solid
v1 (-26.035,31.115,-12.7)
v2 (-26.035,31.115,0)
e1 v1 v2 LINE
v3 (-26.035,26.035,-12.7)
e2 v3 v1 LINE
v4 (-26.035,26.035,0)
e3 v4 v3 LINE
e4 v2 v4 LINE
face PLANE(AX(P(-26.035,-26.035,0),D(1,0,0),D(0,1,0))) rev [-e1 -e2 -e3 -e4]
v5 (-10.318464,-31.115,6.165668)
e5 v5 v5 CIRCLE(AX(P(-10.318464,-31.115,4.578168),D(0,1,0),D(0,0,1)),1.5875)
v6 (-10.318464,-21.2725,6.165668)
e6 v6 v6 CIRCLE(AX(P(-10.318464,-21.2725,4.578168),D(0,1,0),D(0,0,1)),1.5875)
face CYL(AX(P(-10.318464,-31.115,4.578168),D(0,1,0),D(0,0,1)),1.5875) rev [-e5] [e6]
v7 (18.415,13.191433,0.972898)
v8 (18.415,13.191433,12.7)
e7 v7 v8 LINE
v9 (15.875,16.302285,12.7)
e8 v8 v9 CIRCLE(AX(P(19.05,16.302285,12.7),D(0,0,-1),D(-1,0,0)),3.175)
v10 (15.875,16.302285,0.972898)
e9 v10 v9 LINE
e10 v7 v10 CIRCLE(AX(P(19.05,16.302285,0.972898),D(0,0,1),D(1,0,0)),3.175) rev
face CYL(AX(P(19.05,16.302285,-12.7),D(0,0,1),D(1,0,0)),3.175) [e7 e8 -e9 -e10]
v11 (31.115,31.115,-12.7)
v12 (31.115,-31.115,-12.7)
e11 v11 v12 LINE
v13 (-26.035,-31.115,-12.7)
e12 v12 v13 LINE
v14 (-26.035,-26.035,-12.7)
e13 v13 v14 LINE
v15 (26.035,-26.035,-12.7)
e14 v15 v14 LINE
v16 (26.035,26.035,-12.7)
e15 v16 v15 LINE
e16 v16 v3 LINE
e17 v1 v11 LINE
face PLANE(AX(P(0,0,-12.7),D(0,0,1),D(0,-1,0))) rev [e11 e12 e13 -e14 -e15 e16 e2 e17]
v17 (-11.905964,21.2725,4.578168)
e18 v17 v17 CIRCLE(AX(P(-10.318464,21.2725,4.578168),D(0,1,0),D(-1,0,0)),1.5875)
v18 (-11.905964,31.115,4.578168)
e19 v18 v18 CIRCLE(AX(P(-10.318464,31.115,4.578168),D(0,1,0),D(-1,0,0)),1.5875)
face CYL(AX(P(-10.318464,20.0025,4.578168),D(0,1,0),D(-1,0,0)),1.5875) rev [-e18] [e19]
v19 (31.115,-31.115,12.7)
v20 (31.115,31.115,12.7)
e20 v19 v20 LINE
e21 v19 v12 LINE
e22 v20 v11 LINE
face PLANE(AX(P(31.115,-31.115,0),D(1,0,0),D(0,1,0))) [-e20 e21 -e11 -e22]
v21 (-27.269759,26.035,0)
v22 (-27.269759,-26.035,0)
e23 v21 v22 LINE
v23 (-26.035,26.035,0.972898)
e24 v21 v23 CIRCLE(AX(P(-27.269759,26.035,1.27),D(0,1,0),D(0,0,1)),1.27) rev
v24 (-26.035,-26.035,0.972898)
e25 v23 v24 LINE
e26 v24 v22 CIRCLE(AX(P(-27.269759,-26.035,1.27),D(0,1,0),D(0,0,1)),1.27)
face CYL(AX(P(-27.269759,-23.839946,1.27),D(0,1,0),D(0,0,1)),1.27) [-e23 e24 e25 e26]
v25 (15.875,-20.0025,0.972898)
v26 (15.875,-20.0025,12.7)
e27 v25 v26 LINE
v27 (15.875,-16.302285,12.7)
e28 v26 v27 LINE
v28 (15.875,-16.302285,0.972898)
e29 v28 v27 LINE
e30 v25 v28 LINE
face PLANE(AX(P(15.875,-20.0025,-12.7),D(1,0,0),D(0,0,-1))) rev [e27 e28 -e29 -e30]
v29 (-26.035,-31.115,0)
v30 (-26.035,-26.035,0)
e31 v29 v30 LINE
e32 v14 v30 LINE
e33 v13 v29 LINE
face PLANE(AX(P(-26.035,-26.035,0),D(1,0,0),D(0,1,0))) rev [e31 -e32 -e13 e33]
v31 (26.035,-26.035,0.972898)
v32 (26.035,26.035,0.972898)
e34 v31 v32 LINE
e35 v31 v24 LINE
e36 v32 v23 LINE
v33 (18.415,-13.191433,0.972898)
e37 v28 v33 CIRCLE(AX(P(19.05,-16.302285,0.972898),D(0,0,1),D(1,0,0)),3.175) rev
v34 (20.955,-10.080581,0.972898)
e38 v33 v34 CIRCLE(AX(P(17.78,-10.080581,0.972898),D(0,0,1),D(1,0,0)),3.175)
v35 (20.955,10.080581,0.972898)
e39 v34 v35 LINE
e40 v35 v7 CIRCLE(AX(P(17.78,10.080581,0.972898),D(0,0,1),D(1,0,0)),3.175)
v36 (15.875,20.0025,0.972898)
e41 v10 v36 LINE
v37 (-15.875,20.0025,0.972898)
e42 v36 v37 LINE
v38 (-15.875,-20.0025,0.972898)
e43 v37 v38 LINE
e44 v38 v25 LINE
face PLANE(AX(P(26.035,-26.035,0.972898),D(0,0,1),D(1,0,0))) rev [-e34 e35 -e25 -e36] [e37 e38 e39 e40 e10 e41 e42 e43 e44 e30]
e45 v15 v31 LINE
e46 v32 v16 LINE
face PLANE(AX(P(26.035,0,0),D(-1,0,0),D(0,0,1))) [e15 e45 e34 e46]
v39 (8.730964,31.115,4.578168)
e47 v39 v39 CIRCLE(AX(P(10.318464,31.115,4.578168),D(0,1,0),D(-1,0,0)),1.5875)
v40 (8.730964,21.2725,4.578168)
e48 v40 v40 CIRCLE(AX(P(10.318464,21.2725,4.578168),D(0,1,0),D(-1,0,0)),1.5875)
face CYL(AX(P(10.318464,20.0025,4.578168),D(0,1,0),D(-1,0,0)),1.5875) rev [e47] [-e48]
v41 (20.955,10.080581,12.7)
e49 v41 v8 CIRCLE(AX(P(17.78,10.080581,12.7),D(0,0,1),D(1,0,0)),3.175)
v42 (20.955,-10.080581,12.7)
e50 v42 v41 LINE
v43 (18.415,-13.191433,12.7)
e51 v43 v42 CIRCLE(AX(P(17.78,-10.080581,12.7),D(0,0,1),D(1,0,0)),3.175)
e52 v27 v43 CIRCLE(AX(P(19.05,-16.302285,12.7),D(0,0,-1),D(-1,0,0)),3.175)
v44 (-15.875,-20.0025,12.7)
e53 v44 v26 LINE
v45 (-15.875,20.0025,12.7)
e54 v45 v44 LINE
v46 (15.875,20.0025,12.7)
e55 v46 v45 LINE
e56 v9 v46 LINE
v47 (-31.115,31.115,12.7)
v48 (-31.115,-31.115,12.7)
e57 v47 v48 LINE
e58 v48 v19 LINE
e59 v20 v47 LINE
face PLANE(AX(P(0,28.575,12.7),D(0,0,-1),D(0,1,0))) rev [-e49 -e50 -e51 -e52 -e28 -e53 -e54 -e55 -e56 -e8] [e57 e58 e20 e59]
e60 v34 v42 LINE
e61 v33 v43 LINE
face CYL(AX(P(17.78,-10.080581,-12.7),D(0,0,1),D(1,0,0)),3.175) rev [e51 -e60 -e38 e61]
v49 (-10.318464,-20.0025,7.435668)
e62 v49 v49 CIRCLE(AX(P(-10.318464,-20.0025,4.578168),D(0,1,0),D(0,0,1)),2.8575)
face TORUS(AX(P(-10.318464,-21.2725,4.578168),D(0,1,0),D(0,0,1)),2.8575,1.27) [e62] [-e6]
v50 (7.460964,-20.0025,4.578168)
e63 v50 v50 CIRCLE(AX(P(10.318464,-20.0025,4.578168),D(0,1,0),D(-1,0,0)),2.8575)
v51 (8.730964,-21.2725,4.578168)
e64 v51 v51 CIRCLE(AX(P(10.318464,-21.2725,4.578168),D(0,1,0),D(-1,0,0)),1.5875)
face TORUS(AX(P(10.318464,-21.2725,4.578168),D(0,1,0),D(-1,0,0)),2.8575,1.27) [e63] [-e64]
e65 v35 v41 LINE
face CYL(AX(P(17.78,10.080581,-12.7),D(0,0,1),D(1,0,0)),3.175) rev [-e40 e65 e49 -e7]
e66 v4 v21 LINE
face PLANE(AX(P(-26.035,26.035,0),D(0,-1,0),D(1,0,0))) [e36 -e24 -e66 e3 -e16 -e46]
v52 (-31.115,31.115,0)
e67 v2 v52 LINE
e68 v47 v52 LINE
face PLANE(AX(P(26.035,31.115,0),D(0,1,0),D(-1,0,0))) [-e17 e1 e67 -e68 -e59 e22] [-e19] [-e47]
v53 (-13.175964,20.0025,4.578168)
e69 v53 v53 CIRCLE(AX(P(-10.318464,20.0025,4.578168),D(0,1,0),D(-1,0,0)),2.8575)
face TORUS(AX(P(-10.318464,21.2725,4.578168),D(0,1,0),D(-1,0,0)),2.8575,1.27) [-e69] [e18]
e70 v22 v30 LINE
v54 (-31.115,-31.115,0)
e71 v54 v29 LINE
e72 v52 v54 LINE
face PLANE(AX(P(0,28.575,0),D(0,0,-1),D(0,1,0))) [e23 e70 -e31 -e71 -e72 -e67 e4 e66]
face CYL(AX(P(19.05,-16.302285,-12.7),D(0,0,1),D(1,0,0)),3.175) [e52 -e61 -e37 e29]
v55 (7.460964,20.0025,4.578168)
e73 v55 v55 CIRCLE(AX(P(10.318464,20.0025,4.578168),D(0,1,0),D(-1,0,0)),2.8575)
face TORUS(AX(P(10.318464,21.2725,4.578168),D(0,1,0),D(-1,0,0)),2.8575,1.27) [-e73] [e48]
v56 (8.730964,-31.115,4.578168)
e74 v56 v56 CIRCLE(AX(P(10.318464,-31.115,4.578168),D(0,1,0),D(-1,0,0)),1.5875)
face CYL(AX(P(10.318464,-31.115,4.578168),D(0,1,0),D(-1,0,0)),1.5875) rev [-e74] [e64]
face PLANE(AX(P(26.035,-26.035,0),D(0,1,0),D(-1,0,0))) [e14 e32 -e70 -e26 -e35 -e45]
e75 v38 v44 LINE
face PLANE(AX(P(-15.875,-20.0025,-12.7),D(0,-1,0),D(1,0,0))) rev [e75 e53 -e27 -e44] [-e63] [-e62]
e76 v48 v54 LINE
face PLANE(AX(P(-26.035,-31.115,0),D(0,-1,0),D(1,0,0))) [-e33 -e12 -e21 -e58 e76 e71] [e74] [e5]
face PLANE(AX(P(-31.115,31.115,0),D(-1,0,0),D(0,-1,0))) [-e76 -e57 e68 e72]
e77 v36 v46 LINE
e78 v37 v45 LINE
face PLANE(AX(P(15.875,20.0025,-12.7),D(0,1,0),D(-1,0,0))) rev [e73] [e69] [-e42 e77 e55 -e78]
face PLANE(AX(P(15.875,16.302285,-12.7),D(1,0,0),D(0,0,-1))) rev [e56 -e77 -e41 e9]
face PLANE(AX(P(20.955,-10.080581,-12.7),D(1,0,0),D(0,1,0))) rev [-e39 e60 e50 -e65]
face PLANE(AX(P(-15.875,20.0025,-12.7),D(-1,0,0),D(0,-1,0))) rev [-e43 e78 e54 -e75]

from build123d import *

# Parameters (mm, degrees)
BOSS_EXTRUDE1_START   = -31.115
BOSS_EXTRUDE1_DEPTH   = 62.23
BOSS_EXTRUDE1_2_DEPTH = 5.08
BOSS_EXTRUDE1_START_2 = 26.035
BOSS_EXTRUDE1_3_DEPTH = 5.08
SKETCH2_W             = 13.672898009
SKETCH2_H             = 52.07
CUT_EXTRUDE1_DEPTH    = 52.07
CUT_EXTRUDE3_DEPTH    = 51.80793688


with BuildPart() as part:
    # Boss-Extrude1: read off the stored shape, not the designer's step
    # Boss-Extrude1 outline → Boss-Extrude1 (new body)
    with BuildSketch(Plane(origin=(0, 0, 0), x_dir=(1, 0, 0), z_dir=(0, 1, 0)).offset(BOSS_EXTRUDE1_START)):
        with BuildLine():
            Line((-26.035, 12.7), (-26.035, -0.972898009))
            ThreePointArc((-26.035, -0.972898009), (-26.483762918, -0.272448114), (-27.269759251, 0))
            Line((-27.269759251, 0), (-31.115, 0))
            Line((-31.115, 0), (-31.115, -12.7))
            Line((-31.115, -12.7), (31.115, -12.7))
            Line((31.115, -12.7), (31.115, 12.7))
            Line((31.115, 12.7), (-26.035, 12.7))
        make_face()
    extrude(amount=BOSS_EXTRUDE1_DEPTH)

    # Boss-Extrude1 2 outline → Boss-Extrude1 2 (add)
    with BuildSketch(Plane(origin=(0, 0, 0), x_dir=(1, 0, 0), z_dir=(0, 1, 0)).offset(BOSS_EXTRUDE1_START)):
        with BuildLine():
            Line((-26.035, -0.972898009), (-26.035, 0))
            Line((-26.035, 0), (-27.269759251, 0))
            ThreePointArc((-27.269759251, 0), (-26.483762918, -0.272448114), (-26.035, -0.972898009))
        make_face()
    extrude(amount=BOSS_EXTRUDE1_2_DEPTH)

    # Boss-Extrude1 3 outline → Boss-Extrude1 3 (add)
    with BuildSketch(Plane(origin=(0, 0, 0), x_dir=(1, 0, 0), z_dir=(0, 1, 0)).offset(BOSS_EXTRUDE1_START_2)):
        with BuildLine():
            Line((-26.035, -0.972898009), (-26.035, 0))
            Line((-26.035, 0), (-27.269759251, 0))
            ThreePointArc((-27.269759251, 0), (-26.483762918, -0.272448114), (-26.035, -0.972898009))
        make_face()
    extrude(amount=BOSS_EXTRUDE1_3_DEPTH)

    # Sketch2 → Cut-Extrude1 (cut)
    with BuildSketch(Plane.ZY.offset(26.035)):
        with Locations((-5.863550996, 0)):
            Rectangle(SKETCH2_W, SKETCH2_H)
    extrude(amount=-CUT_EXTRUDE1_DEPTH, mode=Mode.SUBTRACT)

    # Sketch4 → Cut-Extrude3 (cut, through all)
    with BuildSketch(Plane.XY.offset(12.7)):
        with BuildLine():
            Line((15.875, 16.302284846), (15.875, 20.0025))
            Line((15.875, 20.0025), (-15.875, 20.0025))
            Line((-15.875, 20.0025), (-15.875, -20.0025))
            Line((-15.875, -20.0025), (15.875, -20.0025))
            Line((15.875, -20.0025), (15.875, -16.302284846))
            ThreePointArc((15.875, -16.302284846), (16.590655575, -14.294238532), (18.415, -13.191432873))
            ThreePointArc((18.415, -13.191432873), (20.239344425, -12.088627214), (20.955, -10.0805809))
            Line((20.955, -10.0805809), (20.955, 10.0805809))
            ThreePointArc((20.955, 10.0805809), (20.239344425, 12.088627214), (18.415, 13.191432873))
            ThreePointArc((18.415, 13.191432873), (16.590655575, 14.294238532), (15.875, 16.302284846))
        make_face()
    extrude(amount=-CUT_EXTRUDE3_DEPTH, mode=Mode.SUBTRACT)

    # Sketch5 → Cut-Revolve1 (revolve, cut)
    with BuildSketch(Plane(origin=(0, 0, 4.578168392), x_dir=(-1, 0, 0), z_dir=(0, 0, -1)), mode=Mode.PRIVATE) as cut_revolve1_sk:
        with BuildLine():
            Line((8.730963547, -31.115), (10.318463547, -31.115))
            Line((10.318463547, -31.115), (10.318463547, -20.0025))
            Line((10.318463547, -20.0025), (7.460963547, -20.0025))
            ThreePointArc((7.460963547, -20.0025), (8.358989159, -20.374474388), (8.730963547, -21.2725))
            Line((8.730963547, -21.2725), (8.730963547, -31.115))
        make_face()
    revolve(cut_revolve1_sk.sketch.rotate(Axis((-10.318463547, -31.115, 4.578168392), (0, 1, 0)), 270), axis=Axis((-10.318463547, -31.115, 4.578168392), (0, 1, 0)), mode=Mode.SUBTRACT)

    # Sketch6 → Cut-Revolve2 (revolve, cut)
    with BuildSketch(Plane(origin=(0, 0, 4.578168392), x_dir=(-1, 0, 0), z_dir=(0, 0, -1)), mode=Mode.PRIVATE) as cut_revolve2_sk:
        with BuildLine():
            Line((-11.905963547, -31.115), (-10.318463547, -31.115))
            Line((-10.318463547, -31.115), (-10.318463547, -20.0025))
            Line((-10.318463547, -20.0025), (-13.175963547, -20.0025))
            ThreePointArc((-13.175963547, -20.0025), (-12.277937935, -20.374474388), (-11.905963547, -21.2725))
            Line((-11.905963547, -21.2725), (-11.905963547, -31.115))
        make_face()
    revolve(cut_revolve2_sk.sketch.rotate(Axis((10.318463547, -31.115, 4.578168392), (0, 1, 0)), 180), axis=Axis((10.318463547, -31.115, 4.578168392), (0, 1, 0)), mode=Mode.SUBTRACT)

    # Sketch7 → Cut-Revolve3 (revolve, cut)
    with BuildSketch(Plane(origin=(0, 0, 4.578168392), x_dir=(-1, 0, 0), z_dir=(0, 0, -1)), mode=Mode.PRIVATE) as cut_revolve3_sk:
        with BuildLine():
            Line((7.460963547, 20.0025), (10.318463547, 20.0025))
            Line((10.318463547, 20.0025), (10.318463547, 31.115))
            Line((10.318463547, 31.115), (8.730963547, 31.115))
            Line((8.730963547, 31.115), (8.730963547, 21.2725))
            ThreePointArc((8.730963547, 21.2725), (8.358989159, 20.374474388), (7.460963547, 20.0025))
        make_face()
    revolve(cut_revolve3_sk.sketch.rotate(Axis((-10.318463547, 20.0025, 4.578168392), (0, 1, 0)), 180), axis=Axis((-10.318463547, 20.0025, 4.578168392), (0, 1, 0)), mode=Mode.SUBTRACT)

    # Sketch8 → Cut-Revolve4 (revolve, cut)
    with BuildSketch(Plane(origin=(0, 0, 4.578168392), x_dir=(-1, 0, 0), z_dir=(0, 0, -1)), mode=Mode.PRIVATE) as cut_revolve4_sk:
        with BuildLine():
            Line((-13.175963547, 20.0025), (-10.318463547, 20.0025))
            Line((-10.318463547, 20.0025), (-10.318463547, 31.115))
            Line((-10.318463547, 31.115), (-11.905963547, 31.115))
            Line((-11.905963547, 31.115), (-11.905963547, 21.2725))
            ThreePointArc((-11.905963547, 21.2725), (-12.277937935, 20.374474388), (-13.175963547, 20.0025))
        make_face()
    revolve(cut_revolve4_sk.sketch.rotate(Axis((10.318463547, 20.0025, 4.578168392), (0, 1, 0)), 180), axis=Axis((10.318463547, 20.0025, 4.578168392), (0, 1, 0)), mode=Mode.SUBTRACT)


solid = part.part
